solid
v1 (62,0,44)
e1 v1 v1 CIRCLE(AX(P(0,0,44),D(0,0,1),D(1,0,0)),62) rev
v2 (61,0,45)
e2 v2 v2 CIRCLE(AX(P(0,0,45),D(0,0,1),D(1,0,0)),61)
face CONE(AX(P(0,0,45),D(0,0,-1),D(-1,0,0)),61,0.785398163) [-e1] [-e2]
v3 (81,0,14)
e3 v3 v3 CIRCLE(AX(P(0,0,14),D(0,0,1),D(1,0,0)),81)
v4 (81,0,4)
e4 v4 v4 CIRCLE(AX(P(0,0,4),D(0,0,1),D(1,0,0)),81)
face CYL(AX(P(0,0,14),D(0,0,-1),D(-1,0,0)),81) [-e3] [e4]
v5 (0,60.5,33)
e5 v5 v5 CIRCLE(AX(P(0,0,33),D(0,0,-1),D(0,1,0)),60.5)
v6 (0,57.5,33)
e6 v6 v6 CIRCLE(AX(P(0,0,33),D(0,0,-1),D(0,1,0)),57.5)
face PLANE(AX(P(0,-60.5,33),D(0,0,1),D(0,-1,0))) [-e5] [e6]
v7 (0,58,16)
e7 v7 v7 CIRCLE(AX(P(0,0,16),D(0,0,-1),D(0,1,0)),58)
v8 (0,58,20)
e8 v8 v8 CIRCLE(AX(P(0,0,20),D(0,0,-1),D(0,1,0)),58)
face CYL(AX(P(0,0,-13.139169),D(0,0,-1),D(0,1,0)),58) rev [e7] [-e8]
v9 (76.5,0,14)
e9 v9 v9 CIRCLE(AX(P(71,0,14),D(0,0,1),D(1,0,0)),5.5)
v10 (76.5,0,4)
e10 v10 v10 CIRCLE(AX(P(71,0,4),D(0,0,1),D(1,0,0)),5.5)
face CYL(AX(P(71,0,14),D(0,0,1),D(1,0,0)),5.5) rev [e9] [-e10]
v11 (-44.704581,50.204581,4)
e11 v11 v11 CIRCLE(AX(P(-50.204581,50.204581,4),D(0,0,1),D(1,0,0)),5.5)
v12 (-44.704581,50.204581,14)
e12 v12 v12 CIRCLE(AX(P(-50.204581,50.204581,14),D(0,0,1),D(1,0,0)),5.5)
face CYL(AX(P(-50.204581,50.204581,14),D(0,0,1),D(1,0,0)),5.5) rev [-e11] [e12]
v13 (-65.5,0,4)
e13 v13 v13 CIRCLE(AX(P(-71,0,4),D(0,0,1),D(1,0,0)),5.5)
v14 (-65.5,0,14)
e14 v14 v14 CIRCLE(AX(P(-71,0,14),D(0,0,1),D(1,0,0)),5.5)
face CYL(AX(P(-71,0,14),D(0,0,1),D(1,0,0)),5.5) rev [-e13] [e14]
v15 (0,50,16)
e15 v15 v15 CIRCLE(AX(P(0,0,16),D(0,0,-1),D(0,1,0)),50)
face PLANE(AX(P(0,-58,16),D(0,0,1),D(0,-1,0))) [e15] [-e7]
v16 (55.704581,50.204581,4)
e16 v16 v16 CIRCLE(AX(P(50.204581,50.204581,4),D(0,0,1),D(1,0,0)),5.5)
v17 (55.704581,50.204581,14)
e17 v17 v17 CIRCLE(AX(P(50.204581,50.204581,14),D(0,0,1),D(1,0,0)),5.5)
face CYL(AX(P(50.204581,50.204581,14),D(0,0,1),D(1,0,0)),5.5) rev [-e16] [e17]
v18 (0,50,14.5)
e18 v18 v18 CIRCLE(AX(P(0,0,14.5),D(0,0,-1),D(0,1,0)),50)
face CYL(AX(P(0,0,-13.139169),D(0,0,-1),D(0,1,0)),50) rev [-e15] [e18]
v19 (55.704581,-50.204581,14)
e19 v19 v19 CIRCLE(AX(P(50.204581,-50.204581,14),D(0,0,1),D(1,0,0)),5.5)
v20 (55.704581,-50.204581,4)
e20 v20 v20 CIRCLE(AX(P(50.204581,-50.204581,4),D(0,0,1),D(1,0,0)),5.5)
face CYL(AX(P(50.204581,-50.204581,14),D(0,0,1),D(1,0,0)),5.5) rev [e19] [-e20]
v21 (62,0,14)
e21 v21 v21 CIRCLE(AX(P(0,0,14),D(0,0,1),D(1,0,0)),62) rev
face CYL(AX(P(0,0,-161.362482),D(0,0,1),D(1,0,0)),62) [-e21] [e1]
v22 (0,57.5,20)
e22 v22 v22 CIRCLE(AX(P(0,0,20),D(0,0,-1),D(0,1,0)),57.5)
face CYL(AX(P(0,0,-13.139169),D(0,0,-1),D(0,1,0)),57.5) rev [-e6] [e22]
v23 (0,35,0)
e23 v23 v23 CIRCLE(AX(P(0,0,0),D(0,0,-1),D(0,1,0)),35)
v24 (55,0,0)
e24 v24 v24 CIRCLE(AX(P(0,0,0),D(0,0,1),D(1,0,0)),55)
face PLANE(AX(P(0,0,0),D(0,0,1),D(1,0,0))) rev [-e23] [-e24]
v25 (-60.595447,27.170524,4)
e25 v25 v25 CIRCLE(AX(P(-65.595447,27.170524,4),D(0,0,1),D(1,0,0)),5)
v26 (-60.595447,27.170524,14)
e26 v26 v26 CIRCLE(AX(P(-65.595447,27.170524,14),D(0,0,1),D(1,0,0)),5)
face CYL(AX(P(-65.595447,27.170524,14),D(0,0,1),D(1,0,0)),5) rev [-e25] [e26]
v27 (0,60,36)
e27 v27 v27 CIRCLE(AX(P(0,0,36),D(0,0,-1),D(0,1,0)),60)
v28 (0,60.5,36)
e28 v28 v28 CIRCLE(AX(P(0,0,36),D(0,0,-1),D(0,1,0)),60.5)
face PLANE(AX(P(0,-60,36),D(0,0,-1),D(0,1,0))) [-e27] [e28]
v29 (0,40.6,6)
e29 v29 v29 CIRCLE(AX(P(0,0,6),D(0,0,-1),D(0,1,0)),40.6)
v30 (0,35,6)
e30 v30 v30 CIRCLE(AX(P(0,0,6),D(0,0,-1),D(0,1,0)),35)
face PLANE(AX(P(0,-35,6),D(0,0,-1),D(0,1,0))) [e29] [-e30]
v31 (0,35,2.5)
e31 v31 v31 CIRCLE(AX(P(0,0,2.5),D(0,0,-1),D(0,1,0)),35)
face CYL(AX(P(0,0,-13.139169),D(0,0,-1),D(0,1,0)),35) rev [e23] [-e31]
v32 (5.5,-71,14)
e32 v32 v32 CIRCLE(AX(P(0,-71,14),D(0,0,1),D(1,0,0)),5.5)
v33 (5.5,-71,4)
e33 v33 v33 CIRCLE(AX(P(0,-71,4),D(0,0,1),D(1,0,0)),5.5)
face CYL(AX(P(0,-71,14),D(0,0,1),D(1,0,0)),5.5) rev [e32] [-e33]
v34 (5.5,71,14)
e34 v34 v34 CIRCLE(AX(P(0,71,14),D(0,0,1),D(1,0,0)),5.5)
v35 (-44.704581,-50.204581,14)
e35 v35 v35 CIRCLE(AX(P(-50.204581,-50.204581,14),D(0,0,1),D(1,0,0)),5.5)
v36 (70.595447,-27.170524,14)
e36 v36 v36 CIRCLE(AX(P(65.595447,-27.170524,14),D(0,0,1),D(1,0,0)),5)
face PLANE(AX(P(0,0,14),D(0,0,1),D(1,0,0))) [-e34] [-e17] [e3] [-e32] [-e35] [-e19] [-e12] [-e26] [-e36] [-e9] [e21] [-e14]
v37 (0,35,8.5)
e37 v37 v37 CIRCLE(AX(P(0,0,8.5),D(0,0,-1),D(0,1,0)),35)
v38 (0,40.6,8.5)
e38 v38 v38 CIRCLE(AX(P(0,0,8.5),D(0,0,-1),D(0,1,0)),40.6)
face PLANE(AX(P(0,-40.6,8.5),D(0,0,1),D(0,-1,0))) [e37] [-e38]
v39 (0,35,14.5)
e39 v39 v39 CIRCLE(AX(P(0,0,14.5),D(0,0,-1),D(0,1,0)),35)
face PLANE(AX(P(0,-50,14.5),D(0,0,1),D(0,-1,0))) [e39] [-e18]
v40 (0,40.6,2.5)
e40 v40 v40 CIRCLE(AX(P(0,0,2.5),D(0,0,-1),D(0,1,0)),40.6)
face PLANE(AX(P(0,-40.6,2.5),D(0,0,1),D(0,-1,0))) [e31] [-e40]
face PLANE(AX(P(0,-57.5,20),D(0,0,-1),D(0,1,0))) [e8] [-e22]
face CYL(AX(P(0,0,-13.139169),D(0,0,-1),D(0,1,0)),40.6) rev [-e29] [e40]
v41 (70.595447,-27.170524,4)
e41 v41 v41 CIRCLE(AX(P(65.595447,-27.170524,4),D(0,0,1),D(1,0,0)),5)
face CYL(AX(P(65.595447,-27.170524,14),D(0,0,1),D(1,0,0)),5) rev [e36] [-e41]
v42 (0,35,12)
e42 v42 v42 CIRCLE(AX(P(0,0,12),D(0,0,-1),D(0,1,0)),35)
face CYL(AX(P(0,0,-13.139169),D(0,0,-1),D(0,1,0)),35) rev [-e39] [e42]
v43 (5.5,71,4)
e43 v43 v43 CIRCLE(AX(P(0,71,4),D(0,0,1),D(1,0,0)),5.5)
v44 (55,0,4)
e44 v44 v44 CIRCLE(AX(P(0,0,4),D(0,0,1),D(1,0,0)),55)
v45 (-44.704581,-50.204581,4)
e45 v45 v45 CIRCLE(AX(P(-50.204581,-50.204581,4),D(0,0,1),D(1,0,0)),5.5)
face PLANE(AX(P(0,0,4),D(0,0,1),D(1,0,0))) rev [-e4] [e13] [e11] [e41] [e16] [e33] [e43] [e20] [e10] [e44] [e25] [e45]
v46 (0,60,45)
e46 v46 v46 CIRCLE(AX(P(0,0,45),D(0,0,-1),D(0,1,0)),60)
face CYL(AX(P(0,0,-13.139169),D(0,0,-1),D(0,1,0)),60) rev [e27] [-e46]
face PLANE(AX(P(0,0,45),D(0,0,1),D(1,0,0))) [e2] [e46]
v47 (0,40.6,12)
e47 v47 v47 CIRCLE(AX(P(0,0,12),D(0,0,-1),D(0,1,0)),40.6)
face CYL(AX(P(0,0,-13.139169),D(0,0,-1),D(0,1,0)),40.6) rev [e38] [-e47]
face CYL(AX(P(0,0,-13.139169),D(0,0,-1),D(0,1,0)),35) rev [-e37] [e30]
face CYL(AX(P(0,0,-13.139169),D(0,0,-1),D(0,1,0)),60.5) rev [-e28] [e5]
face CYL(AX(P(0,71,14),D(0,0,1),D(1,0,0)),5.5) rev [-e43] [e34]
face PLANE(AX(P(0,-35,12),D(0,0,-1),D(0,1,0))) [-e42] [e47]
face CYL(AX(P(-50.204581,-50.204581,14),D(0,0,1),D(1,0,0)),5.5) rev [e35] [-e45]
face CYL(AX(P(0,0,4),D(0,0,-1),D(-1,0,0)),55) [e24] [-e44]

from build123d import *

# Parameters (mm, degrees)
SKETCH_1_R               = 55
EXTRUDE_1_DEPTH          = 4
SKETCH_2_R               = 81
EXTRUDE_2_DEPTH          = 10
EXTRUDE_START            = 14
SKETCH_3_R               = 62
EXTRUDE_3_DEPTH          = 31
HOLE_WIZARD_1_D          = 11
PATTERN_CIRCULAR_1_COUNT = 8
HOLE_START               = 4
HOLE_WIZARD_2_OUTLINE_R  = 5
HOLE_WIZARD_2_DEPTH      = 10
CHAMFER_1_SIZE           = 1


# Read off the part's stored shape, not the designer's step: 孔2
with BuildPart() as part:
    # 草图1 → 凸台-拉伸1 (new body)
    with BuildSketch(Plane.XY):
        Circle(SKETCH_1_R)
    extrude(amount=EXTRUDE_1_DEPTH)

    # 草图2 → 凸台-拉伸2 (add)
    with BuildSketch(Plane.XY.offset(4)):
        Circle(SKETCH_2_R)
    extrude(amount=EXTRUDE_2_DEPTH)

    # 草图3 → 凸台-拉伸3 (add)
    with BuildSketch(Plane.XY.offset(EXTRUDE_START)):
        Circle(SKETCH_3_R)
    extrude(amount=EXTRUDE_3_DEPTH)

    # 草图4 → 切除-旋转1 (revolve, cut)
    with BuildSketch(Plane(origin=(0, 0, 0), x_dir=(0, 0, -1), z_dir=(1, 0, 0)), mode=Mode.PRIVATE) as cut_revolve_1_sk:
        Polygon((-45, 0), (-45, -60), (-36, -60), (-36, -60.5), (-33, -60.5), (-33, -57.5), (-20, -57.5), (-20, -58), (-16, -58), (-16, -50), (-14.5, -50), (-14.5, -35), (-12, -35), (-12, -40.6), (-8.5, -40.6), (-8.5, -35), (-6, -35), (-6, -40.6), (-2.5, -40.6), (-2.5, -35), (0, -35), (0, 0), align=None)
    revolve(cut_revolve_1_sk.sketch.rotate(Axis((0, 0, -13.139169211), (0, 0, 1)), 180), axis=Axis((0, 0, -13.139169211), (0, 0, 1)), mode=Mode.SUBTRACT)

    # 孔1 (through all)
    with Locations(Plane.XY.offset(14)):
        with Locations((-71, 0)):
            hole_wizard_1 = Hole(HOLE_WIZARD_1_D / 2)

    # 阵列(圆周)1: 孔1 ×8 about axis
    pattern_circular_1_axis = Axis((0, 0, 0), (0, 0, 1))
    for i in range(1, PATTERN_CIRCULAR_1_COUNT):
        add(hole_wizard_1.rotate(pattern_circular_1_axis, i * 360 / PATTERN_CIRCULAR_1_COUNT), mode=Mode.SUBTRACT)

    # 孔2 outline → 孔2 (cut)
    with BuildSketch(Plane.XY.offset(HOLE_START)):
        with Locations((-65.595446808, 27.170523698)):
            Circle(HOLE_WIZARD_2_OUTLINE_R)
        with Locations((65.595446808, -27.170523698)):
            Circle(HOLE_WIZARD_2_OUTLINE_R)
    extrude(amount=HOLE_WIZARD_2_DEPTH, mode=Mode.SUBTRACT)

    # 倒角1
    chamfer_1_edges = [part.edges().sort_by_distance(p)[0] for p in [
        (-62, 0, 45),
    ]]
    chamfer(chamfer_1_edges, length=CHAMFER_1_SIZE)


solid = part.part
